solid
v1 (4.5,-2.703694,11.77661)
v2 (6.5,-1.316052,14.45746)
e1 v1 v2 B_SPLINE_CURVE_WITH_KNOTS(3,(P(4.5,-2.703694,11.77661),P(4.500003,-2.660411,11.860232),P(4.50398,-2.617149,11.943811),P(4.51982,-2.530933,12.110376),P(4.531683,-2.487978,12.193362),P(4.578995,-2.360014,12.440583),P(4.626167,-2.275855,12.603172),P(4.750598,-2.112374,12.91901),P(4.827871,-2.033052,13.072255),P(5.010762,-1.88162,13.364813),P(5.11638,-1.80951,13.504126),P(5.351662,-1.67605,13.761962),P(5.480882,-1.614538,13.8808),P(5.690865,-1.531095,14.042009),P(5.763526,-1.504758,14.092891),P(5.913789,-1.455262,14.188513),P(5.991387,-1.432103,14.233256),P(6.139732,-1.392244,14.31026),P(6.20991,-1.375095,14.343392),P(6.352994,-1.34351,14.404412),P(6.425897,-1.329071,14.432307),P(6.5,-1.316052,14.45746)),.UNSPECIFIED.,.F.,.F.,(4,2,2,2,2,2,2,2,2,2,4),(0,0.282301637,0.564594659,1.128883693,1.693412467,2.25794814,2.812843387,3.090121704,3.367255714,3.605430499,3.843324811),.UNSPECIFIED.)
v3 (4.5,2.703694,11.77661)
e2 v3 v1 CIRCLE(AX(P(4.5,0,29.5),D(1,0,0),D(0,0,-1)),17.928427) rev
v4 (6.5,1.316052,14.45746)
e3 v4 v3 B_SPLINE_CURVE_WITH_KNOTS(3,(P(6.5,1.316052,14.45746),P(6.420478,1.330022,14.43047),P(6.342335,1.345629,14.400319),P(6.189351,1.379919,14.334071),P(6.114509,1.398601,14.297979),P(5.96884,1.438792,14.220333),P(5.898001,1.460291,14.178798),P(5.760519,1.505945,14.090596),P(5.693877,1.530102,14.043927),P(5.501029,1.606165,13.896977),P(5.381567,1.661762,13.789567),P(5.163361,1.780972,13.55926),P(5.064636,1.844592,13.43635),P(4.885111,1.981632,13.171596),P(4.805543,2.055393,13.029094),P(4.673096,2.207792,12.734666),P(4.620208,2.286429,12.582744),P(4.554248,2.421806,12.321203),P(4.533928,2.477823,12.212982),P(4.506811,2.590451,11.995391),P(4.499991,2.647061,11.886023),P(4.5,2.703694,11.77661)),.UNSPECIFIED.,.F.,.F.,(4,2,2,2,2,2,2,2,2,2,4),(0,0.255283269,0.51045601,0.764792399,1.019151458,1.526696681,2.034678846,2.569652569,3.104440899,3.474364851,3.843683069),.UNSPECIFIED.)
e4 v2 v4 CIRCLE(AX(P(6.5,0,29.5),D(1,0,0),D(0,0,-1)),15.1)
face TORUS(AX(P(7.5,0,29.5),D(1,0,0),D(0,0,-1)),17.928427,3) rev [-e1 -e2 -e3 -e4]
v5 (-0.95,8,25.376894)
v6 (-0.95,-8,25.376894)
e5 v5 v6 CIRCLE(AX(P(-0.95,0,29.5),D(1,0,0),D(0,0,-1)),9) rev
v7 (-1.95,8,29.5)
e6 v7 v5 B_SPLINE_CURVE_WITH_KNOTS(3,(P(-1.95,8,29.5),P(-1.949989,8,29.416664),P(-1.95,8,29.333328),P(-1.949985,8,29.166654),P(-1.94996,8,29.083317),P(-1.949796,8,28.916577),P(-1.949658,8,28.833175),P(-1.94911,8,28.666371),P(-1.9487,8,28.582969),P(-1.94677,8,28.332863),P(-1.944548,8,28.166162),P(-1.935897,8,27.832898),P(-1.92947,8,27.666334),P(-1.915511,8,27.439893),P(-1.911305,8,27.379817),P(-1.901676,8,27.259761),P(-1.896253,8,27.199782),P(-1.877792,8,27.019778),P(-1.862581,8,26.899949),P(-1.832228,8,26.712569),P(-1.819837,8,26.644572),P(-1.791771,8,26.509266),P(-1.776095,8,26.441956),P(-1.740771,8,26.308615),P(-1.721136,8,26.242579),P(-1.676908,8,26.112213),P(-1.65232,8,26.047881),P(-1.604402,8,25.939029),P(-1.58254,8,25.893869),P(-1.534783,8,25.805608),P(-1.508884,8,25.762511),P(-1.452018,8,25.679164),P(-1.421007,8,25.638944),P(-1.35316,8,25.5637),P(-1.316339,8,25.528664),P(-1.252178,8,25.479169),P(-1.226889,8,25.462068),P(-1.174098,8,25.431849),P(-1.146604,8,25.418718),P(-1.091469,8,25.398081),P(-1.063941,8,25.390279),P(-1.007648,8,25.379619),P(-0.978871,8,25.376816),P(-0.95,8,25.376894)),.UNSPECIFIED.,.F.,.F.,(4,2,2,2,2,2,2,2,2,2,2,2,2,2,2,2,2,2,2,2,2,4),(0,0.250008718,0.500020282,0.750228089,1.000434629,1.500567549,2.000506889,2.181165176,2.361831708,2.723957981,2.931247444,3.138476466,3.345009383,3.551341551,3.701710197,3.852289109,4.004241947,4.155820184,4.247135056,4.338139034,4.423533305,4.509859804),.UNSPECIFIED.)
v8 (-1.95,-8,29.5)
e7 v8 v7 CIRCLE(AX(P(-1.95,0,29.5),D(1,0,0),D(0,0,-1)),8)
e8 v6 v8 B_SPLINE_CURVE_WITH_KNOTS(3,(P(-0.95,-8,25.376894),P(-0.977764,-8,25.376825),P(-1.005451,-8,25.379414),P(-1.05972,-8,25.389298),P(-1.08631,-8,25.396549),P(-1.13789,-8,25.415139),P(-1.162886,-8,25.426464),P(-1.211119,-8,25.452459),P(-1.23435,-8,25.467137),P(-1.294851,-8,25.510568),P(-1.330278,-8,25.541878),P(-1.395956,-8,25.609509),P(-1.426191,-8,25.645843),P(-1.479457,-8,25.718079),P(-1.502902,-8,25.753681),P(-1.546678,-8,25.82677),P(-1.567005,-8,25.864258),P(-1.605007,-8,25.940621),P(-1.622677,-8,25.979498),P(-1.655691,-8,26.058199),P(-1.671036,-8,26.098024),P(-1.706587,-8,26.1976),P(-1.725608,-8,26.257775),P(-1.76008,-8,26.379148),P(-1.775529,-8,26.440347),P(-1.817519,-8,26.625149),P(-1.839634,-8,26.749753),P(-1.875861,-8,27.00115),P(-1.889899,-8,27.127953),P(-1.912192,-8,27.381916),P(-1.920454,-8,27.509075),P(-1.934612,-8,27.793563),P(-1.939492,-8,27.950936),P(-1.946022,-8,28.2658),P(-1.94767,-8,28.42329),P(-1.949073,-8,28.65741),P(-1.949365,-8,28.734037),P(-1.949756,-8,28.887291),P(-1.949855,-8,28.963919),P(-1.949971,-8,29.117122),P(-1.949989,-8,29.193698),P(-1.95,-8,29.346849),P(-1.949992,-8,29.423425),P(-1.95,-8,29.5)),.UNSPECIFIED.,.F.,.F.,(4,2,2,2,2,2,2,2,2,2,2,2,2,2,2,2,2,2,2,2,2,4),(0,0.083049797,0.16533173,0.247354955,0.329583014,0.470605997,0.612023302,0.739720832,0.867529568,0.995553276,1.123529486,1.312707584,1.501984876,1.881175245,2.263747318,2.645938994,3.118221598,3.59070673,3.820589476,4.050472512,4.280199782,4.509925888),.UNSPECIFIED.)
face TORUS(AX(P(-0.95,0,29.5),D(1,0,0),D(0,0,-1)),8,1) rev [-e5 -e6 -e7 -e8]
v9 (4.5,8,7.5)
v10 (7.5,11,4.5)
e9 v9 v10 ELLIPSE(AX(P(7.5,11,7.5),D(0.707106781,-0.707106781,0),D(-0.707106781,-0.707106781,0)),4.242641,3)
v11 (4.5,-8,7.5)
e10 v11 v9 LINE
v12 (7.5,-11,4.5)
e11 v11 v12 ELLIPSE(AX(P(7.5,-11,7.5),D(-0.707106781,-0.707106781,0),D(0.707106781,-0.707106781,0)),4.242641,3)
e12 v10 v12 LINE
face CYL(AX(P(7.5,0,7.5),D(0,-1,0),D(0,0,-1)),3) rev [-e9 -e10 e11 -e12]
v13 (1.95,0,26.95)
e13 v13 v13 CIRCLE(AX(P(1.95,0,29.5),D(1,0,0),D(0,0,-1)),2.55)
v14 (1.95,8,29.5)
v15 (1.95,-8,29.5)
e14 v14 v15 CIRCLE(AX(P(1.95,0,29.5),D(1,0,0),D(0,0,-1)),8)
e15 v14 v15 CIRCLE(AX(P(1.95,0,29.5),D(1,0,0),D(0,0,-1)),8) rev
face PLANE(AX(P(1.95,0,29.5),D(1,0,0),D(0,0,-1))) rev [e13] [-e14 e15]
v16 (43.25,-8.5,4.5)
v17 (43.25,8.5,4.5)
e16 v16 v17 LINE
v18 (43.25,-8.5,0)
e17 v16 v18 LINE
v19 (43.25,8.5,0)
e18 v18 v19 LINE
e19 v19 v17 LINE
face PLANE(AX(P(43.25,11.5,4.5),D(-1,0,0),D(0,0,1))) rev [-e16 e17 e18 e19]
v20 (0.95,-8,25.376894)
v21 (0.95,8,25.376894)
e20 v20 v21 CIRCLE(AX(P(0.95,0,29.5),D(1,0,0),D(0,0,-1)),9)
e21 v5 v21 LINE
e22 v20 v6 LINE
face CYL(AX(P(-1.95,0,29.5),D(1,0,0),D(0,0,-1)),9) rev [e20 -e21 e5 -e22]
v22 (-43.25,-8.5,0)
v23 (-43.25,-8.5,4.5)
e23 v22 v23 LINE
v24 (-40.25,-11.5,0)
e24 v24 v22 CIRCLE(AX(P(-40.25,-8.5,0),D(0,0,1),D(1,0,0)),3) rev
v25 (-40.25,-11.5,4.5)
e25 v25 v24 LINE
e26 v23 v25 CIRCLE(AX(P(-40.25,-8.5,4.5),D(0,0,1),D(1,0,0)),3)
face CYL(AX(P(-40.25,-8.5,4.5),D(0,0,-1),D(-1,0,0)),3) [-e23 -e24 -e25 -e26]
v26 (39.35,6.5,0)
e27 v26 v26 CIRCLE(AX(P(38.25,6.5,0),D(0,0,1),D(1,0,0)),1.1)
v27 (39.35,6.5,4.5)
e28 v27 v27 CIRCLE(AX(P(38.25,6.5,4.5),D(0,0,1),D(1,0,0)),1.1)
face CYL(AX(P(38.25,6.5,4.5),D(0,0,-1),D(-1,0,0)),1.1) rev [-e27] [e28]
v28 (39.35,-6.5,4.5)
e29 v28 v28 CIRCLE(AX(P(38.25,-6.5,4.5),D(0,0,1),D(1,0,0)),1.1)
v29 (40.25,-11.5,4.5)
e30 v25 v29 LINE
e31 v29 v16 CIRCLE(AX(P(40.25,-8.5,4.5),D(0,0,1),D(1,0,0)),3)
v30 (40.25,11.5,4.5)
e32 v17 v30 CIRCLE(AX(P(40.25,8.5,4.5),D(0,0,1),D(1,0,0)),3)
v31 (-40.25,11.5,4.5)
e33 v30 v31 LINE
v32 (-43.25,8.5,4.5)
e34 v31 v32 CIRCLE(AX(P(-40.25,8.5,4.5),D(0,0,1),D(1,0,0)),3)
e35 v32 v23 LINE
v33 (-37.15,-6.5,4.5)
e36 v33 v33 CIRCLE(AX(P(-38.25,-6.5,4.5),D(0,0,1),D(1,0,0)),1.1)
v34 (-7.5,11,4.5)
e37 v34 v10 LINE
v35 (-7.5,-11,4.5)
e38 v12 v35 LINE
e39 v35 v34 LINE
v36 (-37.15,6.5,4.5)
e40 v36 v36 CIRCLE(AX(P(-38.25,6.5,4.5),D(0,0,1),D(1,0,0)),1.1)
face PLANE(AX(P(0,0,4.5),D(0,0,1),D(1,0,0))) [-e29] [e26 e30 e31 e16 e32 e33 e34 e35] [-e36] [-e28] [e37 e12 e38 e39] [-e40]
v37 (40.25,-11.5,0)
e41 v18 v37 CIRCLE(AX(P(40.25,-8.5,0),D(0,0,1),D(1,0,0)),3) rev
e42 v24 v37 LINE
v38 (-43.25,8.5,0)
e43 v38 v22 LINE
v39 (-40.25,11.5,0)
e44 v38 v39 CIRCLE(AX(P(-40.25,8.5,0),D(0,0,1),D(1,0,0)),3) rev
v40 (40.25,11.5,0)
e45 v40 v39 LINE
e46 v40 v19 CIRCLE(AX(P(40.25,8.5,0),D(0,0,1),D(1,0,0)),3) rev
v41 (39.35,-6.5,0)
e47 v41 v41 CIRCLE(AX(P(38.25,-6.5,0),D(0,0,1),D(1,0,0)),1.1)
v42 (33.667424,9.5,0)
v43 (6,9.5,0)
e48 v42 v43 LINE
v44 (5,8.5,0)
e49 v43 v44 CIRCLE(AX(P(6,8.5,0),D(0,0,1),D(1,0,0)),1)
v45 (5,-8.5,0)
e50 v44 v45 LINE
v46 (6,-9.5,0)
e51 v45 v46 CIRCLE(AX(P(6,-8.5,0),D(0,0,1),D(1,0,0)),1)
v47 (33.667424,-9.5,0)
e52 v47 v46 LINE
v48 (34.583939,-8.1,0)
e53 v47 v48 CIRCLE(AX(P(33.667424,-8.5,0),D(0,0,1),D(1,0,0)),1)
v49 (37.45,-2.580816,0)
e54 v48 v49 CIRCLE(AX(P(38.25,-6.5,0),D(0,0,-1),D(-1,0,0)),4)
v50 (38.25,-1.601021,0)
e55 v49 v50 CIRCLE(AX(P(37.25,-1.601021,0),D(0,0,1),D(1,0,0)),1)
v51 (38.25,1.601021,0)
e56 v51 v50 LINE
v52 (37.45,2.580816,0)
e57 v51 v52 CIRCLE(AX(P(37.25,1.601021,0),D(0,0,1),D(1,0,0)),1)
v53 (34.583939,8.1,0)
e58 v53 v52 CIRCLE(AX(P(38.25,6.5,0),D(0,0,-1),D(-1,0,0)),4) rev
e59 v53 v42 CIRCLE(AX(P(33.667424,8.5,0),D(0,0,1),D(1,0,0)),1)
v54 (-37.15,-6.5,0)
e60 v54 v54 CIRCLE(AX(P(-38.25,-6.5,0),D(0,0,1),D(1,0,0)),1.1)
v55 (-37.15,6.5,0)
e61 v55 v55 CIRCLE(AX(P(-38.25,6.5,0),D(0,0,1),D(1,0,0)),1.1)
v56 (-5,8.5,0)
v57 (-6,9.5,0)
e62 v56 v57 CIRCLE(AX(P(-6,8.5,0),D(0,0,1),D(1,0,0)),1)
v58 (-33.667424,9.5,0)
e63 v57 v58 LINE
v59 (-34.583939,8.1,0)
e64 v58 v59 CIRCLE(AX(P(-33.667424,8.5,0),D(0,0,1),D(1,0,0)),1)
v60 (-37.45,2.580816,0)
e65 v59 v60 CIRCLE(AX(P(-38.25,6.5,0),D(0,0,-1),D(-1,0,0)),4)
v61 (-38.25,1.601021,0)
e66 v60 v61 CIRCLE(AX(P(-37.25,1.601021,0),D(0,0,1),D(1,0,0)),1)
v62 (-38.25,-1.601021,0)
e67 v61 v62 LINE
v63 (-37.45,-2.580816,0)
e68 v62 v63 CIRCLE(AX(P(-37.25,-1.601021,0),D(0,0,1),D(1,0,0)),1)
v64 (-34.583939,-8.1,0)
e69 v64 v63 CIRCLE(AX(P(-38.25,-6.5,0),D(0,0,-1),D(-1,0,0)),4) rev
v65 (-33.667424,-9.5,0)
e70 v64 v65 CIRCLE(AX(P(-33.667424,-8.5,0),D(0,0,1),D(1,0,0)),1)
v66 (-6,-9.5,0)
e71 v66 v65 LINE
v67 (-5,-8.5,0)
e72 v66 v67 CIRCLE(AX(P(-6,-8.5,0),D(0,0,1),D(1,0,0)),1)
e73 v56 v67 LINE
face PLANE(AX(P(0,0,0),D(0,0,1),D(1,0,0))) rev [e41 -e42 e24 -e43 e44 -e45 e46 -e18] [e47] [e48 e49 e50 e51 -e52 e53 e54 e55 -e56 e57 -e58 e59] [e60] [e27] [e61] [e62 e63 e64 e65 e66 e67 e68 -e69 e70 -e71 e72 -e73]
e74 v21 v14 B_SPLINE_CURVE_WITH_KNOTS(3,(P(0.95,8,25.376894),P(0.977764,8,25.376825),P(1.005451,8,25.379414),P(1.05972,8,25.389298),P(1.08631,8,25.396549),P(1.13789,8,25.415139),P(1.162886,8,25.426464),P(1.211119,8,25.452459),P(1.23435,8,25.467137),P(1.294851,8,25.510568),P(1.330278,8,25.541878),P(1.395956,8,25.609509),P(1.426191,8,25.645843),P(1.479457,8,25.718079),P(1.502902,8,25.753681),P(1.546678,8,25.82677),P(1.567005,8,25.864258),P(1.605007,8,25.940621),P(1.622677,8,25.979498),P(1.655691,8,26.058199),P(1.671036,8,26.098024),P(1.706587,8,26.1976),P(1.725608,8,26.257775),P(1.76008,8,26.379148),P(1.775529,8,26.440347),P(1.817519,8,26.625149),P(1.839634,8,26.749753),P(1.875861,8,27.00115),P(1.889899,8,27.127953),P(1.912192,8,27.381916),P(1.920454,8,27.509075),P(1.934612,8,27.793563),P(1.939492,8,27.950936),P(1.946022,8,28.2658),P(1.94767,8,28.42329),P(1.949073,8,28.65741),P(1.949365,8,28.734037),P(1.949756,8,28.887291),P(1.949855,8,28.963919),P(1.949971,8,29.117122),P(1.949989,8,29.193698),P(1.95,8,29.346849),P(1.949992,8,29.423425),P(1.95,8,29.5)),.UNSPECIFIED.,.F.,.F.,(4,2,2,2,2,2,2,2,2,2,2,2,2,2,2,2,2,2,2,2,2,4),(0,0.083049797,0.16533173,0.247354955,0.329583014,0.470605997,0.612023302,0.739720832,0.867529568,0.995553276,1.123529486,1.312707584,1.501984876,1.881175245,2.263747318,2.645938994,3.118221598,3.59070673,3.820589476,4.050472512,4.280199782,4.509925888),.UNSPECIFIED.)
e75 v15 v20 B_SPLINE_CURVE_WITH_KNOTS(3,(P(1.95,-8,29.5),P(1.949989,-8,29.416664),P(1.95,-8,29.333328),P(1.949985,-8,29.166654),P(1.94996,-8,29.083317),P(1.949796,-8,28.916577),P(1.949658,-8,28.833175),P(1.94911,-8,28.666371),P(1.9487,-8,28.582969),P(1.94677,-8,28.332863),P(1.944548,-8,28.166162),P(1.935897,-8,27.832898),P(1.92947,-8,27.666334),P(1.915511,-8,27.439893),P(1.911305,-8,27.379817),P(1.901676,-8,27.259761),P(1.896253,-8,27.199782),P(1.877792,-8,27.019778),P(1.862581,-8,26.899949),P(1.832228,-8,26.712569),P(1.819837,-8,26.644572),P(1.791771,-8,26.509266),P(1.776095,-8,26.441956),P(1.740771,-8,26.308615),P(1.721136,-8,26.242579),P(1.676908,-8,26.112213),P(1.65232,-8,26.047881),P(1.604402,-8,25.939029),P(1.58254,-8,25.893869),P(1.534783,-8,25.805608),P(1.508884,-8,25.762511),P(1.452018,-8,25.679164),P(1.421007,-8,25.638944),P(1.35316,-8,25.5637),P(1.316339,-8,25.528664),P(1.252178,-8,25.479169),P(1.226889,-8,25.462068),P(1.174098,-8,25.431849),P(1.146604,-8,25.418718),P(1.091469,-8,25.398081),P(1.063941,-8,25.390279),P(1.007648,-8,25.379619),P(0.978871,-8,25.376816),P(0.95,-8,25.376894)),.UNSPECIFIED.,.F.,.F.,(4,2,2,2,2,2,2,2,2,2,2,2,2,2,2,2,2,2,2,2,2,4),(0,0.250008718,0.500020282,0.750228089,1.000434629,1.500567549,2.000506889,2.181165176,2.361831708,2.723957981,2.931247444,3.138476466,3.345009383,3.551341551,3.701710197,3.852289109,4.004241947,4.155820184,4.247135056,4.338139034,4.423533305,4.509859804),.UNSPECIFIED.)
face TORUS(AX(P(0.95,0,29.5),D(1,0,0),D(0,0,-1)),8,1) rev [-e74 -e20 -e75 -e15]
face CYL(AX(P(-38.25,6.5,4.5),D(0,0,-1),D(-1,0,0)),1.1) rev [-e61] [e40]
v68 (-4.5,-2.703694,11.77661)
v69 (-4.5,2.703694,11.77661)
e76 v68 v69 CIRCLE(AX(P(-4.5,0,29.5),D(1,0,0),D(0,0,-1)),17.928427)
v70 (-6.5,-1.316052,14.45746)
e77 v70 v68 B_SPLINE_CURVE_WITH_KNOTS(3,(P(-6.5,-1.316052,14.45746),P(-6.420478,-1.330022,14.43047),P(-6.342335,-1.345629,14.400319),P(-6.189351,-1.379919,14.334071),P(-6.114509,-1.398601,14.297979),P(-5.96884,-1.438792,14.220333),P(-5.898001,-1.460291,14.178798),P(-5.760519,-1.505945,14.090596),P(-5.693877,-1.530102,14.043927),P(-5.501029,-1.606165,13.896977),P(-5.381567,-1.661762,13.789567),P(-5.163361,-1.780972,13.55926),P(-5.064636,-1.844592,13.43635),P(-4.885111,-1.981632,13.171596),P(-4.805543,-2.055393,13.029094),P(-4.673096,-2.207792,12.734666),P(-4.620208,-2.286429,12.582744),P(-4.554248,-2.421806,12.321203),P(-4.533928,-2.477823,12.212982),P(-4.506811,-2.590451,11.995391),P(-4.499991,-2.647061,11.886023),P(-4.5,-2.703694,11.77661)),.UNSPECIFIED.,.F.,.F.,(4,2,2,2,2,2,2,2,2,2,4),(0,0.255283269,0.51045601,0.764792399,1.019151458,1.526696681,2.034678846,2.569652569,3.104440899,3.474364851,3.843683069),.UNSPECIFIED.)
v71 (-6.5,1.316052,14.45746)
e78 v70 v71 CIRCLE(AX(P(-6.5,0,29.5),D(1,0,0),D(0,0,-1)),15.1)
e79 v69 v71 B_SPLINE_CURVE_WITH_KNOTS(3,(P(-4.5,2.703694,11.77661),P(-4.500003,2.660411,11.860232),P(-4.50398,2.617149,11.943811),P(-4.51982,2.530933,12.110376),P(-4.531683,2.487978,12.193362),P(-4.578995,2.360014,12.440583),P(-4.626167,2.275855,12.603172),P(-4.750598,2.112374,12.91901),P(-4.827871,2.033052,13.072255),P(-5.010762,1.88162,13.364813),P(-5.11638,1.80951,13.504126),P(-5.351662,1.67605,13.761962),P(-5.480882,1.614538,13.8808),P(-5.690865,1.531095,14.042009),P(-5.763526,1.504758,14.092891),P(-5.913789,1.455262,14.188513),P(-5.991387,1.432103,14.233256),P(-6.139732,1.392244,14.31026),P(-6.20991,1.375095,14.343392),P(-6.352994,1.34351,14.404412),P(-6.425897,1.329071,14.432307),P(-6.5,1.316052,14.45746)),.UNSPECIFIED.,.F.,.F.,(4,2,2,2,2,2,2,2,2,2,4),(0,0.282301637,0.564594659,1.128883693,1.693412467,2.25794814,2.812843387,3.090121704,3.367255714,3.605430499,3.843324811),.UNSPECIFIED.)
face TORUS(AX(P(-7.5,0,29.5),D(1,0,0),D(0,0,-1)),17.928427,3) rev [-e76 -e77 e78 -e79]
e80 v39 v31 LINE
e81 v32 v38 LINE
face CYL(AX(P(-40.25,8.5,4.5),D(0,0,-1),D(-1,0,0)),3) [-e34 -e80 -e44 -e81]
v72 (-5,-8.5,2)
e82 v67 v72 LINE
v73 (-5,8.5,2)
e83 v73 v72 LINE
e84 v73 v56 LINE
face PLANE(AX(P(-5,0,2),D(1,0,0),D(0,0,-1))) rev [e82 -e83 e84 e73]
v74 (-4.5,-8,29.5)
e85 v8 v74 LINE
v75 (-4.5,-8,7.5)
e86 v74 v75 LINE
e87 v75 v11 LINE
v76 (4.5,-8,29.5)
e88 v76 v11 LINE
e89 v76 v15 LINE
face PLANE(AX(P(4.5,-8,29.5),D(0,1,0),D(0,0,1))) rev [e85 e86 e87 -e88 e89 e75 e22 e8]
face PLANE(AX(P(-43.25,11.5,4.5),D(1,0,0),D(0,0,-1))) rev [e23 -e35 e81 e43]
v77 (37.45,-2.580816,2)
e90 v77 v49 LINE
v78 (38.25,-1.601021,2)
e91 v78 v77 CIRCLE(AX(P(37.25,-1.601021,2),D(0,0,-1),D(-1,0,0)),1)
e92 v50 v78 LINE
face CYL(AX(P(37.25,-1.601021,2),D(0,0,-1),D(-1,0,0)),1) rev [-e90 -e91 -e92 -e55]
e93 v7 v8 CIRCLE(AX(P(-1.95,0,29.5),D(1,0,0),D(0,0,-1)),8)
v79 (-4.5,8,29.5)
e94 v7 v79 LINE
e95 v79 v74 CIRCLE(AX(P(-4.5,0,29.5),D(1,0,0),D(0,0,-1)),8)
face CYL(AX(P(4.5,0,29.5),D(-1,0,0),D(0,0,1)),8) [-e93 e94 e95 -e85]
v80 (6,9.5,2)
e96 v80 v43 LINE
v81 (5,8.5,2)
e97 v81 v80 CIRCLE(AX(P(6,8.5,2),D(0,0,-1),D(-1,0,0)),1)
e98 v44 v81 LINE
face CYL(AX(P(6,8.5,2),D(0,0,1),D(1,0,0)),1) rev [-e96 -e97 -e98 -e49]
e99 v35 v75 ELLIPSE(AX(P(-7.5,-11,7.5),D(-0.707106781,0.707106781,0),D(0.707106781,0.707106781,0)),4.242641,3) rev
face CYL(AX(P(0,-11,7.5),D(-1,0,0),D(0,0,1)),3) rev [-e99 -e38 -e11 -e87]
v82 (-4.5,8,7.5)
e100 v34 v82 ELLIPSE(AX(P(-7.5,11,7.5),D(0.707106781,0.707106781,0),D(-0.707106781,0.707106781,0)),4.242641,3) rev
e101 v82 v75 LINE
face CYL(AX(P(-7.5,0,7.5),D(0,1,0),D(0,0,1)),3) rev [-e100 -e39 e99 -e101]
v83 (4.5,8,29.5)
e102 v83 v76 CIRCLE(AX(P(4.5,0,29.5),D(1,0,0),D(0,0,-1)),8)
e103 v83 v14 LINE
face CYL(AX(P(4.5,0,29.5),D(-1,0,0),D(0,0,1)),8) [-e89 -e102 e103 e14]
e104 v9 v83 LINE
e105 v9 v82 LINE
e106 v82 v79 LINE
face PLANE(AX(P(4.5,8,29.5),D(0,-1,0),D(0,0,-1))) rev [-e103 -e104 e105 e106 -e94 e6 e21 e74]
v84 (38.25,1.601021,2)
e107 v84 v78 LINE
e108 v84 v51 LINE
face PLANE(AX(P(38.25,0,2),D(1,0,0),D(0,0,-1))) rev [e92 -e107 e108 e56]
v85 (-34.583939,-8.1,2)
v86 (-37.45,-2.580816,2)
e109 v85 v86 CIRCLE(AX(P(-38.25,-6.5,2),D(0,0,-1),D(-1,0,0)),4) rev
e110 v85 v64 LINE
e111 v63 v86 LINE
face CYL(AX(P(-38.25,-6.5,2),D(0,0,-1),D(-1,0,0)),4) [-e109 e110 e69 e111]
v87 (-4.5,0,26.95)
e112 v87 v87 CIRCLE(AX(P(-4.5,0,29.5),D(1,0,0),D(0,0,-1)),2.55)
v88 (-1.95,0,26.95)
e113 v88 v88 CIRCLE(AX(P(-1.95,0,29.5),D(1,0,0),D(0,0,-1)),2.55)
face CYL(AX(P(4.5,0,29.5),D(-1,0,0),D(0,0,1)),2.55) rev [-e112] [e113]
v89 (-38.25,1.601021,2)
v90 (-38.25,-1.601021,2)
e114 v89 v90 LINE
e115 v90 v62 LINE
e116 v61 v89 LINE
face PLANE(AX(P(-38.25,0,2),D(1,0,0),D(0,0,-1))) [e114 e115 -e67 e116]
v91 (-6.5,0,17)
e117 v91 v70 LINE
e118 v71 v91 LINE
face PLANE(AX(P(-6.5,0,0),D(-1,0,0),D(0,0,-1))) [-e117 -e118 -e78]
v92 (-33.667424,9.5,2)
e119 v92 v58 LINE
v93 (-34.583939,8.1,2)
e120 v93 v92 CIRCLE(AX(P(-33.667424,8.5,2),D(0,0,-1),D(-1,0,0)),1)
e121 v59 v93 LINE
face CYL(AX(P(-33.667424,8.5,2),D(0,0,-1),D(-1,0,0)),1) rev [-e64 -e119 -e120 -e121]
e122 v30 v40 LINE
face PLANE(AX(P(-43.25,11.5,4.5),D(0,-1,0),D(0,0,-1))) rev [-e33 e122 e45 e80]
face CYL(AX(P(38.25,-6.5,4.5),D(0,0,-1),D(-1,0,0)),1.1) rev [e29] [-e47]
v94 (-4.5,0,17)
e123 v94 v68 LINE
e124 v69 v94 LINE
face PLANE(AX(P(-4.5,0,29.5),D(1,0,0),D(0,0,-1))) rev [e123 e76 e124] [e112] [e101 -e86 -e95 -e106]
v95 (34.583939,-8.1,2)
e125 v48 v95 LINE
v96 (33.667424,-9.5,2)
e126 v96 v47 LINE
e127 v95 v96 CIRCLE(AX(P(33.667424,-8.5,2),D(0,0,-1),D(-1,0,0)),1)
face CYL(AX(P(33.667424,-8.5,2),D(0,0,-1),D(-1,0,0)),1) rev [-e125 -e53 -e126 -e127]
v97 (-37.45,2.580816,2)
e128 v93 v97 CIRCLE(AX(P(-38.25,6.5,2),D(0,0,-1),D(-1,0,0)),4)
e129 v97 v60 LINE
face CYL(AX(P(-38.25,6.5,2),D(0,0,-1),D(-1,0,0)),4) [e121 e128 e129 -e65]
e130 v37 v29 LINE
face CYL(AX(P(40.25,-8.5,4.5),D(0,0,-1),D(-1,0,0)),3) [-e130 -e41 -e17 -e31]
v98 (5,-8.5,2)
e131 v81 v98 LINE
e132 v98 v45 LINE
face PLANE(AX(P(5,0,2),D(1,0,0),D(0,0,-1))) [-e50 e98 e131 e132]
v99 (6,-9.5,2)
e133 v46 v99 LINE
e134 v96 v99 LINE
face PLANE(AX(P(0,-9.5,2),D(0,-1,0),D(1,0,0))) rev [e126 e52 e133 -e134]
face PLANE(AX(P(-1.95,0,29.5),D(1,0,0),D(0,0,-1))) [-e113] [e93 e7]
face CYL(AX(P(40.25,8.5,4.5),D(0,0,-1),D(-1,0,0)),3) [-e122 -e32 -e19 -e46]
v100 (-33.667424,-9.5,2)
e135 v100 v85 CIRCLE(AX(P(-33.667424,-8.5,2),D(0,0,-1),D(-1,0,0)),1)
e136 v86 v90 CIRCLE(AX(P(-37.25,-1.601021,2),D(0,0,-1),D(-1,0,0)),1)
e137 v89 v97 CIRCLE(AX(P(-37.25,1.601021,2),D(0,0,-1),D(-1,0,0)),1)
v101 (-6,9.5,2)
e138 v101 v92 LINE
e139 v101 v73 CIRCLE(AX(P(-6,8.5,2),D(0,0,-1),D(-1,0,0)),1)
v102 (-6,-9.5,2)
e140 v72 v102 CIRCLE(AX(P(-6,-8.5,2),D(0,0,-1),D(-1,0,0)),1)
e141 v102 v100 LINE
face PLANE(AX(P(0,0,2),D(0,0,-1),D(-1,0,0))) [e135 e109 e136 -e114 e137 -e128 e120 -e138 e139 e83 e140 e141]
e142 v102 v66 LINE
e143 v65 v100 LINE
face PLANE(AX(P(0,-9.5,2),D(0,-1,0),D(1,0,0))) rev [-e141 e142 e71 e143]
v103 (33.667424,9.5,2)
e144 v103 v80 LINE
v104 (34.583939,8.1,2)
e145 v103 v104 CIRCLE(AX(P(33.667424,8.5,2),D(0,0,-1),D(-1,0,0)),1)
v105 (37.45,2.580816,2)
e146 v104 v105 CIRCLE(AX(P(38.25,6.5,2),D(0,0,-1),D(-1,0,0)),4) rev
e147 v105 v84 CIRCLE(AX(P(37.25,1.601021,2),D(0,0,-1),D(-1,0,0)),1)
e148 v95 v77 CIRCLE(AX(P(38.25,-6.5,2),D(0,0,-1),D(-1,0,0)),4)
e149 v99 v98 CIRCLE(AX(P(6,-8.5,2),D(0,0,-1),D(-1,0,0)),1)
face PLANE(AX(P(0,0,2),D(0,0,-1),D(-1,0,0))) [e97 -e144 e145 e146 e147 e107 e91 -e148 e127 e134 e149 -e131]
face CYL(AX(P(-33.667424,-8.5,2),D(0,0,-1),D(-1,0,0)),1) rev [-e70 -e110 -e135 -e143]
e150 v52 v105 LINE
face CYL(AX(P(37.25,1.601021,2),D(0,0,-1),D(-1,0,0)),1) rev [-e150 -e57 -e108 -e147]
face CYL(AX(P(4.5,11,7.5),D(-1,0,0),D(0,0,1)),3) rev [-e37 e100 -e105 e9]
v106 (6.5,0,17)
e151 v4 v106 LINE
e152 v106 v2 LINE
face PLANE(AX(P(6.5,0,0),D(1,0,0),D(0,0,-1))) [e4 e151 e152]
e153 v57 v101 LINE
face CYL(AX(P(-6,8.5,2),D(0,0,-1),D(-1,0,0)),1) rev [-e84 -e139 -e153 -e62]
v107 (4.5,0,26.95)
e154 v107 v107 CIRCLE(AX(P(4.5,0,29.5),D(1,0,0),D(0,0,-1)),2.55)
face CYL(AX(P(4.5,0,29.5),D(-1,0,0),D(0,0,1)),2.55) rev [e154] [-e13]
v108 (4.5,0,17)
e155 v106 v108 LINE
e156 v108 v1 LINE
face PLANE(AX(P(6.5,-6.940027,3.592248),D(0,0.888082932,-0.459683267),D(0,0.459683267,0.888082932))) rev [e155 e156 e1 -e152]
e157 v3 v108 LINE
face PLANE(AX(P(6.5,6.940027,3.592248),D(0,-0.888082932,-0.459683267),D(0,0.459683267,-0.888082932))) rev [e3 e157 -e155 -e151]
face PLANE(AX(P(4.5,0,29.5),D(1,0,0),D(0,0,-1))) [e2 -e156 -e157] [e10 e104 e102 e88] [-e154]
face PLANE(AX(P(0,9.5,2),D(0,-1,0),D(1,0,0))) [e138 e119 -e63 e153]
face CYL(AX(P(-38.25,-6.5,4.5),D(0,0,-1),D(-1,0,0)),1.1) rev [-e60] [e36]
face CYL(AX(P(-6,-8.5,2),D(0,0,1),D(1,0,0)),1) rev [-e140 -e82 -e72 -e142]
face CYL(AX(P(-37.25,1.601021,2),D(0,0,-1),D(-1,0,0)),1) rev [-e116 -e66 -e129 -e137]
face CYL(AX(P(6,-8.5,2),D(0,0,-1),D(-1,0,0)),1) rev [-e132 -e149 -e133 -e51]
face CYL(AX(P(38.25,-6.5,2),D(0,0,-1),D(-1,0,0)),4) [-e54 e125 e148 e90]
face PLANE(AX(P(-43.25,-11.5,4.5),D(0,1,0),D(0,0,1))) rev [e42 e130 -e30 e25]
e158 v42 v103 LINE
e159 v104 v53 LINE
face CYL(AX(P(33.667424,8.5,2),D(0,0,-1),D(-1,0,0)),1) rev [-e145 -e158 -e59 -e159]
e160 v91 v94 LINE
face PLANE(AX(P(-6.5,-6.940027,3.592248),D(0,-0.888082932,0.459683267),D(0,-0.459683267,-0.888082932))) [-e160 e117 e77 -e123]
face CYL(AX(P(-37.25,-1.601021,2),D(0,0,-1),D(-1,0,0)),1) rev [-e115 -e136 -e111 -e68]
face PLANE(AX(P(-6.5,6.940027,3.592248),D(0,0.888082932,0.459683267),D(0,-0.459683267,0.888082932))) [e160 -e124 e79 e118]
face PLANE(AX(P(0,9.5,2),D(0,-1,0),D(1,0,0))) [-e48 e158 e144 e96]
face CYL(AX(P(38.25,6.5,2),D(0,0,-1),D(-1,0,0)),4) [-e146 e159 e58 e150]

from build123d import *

# Parameters (mm, degrees)
SKETCH1_W           = 86.5
SKETCH1_H           = 23
SKETCH1_R           = 1.1
BOSS_EXTRUDE1_DEPTH = 4.5
CUT_EXTRUDE1_DEPTH  = 2
SKETCH3_R           = 2.55
BOSS_EXTRUDE2_DEPTH = 4.5
SKETCH6_R           = 9
CUT_EXTRUDE3_DEPTH  = 1.95
FILLET1_R           = 3
FILLET2_R           = 1
FILLET3_R           = 1
BOSS_EXTRUDE3_DEPTH = 2
FILLET4_R           = 3


with BuildPart() as part:
    # Sketch1 → Boss-Extrude1 (new body)
    with BuildSketch(Plane.XY):
        Rectangle(SKETCH1_W, SKETCH1_H)
        with Locations((38.25, 6.5)):
            Circle(SKETCH1_R, mode=Mode.SUBTRACT)
        with Locations((38.25, -6.5)):
            Circle(SKETCH1_R, mode=Mode.SUBTRACT)
        with Locations((-38.25, -6.5)):
            Circle(SKETCH1_R, mode=Mode.SUBTRACT)
        with Locations((-38.25, 6.5)):
            Circle(SKETCH1_R, mode=Mode.SUBTRACT)
    extrude(amount=BOSS_EXTRUDE1_DEPTH)

    # Sketch2 → Cut-Extrude1 (cut)
    with BuildSketch(Plane(origin=(0, 0, 0), x_dir=(-1, 0, 0), z_dir=(0, 0, -1))):
        with BuildLine():
            Line((-5, 9.5), (-35.604248689, 9.5))
            ThreePointArc((-35.604248689, 9.5), (-34.508342613, 5.085786438), (-38.25, 2.5))
            Line((-38.25, 2.5), (-38.25, -2.5))
            ThreePointArc((-38.25, -2.5), (-34.508342613, -5.085786438), (-35.604248689, -9.5))
            Line((-35.604248689, -9.5), (-5, -9.5))
            Line((-5, -9.5), (-5, 9.5))
        make_face()
        with BuildLine():
            Line((35.604248689, 9.5), (5, 9.5))
            Line((5, 9.5), (5, -9.5))
            Line((5, -9.5), (35.604248689, -9.5))
            ThreePointArc((35.604248689, -9.5), (34.508342613, -5.085786438), (38.25, -2.5))
            Line((38.25, -2.5), (38.25, 2.5))
            ThreePointArc((38.25, 2.5), (34.508342613, 5.085786438), (35.604248689, 9.5))
        make_face()
    extrude(amount=-CUT_EXTRUDE1_DEPTH, mode=Mode.SUBTRACT)

    # Sketch3 → Boss-Extrude2 (add, symmetric)
    with BuildSketch(Plane(origin=(0, 0, 0), x_dir=(0, 0, -1), z_dir=(1, 0, 0))):
        with BuildLine():
            Line((-29.5, 8), (-4.5, 8))
            Line((-4.5, 8), (-4.5, -8))
            Line((-4.5, -8), (-29.5, -8))
            ThreePointArc((-29.5, -8), (-37.5, 0), (-29.5, 8))
        make_face()
        with Locations((-29.5, 0)):
            Circle(SKETCH3_R, mode=Mode.SUBTRACT)
    extrude(amount=BOSS_EXTRUDE2_DEPTH, both=True)

    # Sketch6 → Cut-Extrude3 (cut, symmetric)
    with BuildSketch(Plane(origin=(0, 0, 0), x_dir=(0, 0, -1), z_dir=(1, 0, 0))):
        with Locations((-29.5, 0)):
            Circle(SKETCH6_R)
    extrude(amount=CUT_EXTRUDE3_DEPTH, both=True, mode=Mode.SUBTRACT)

    # Fillet1
    fillet1_edges = [part.edges().sort_by_distance(p)[0] for p in [
        (4.5, 0, 4.5),
        (-4.5, 0, 4.5),
        (0, -8, 4.5),
        (0, 8, 4.5),
        (43.25, -11.5, 2.25),
        (-43.25, -11.5, 2.25),
        (-43.25, 11.5, 2.25),
        (43.25, 11.5, 2.25),
    ]]
    fillet(fillet1_edges, radius=FILLET1_R)

    # Fillet2
    fillet2_edges = [part.edges().sort_by_distance(p)[0] for p in [
        (1.95, 0, 20.5),
        (-1.95, 0, 20.5),
    ]]
    fillet(fillet2_edges, radius=FILLET2_R)

    # Fillet3
    fillet3_edges = [part.edges().sort_by_distance(p)[0] for p in [
        (35.604248689, -9.5, 1),
        (38.25, -2.5, 1),
        (38.25, 2.5, 1),
        (35.604248689, 9.5, 1),
        (5, 9.5, 1),
        (5, -9.5, 1),
        (-35.604248689, -9.5, 1),
        (-5, -9.5, 1),
        (-5, 9.5, 1),
        (-35.604248689, 9.5, 1),
        (-38.25, 2.5, 1),
        (-38.25, -2.5, 1),
    ]]
    fillet(fillet3_edges, radius=FILLET3_R)

    # Sketch7 → Boss-Extrude3 (add)
    with BuildSketch(Plane(origin=(4.5, 0, 0), x_dir=(0, 0, -1), z_dir=(1, 0, 0))):
        Polygon((-14.457460059, 1.316051715), (-17, 0), (-14.457460059, 0), align=None)
        Polygon((-14.457460059, 0), (-17, 0), (-14.457460059, -1.316051715), align=None)
        with BuildLine():
            Line((-14.457460059, 0), (-14.457460059, -1.316051715))
            ThreePointArc((-14.457460059, -1.316051715), (-14.414371854, -0.658652749), (-14.4, 0))
            Line((-14.4, 0), (-14.457460059, 0))
        make_face()
        with BuildLine():
            ThreePointArc((-14.4, 0), (-14.414371854, 0.658652749), (-14.457460059, 1.316051715))
            Line((-14.457460059, 1.316051715), (-14.457460059, 0))
            Line((-14.457460059, 0), (-14.4, 0))
        make_face()
    boss_extrude3 = extrude(amount=BOSS_EXTRUDE3_DEPTH)

    # Mirror1: Boss-Extrude3 across plane
    add(boss_extrude3.mirror(Plane(origin=(0, 0, 0), x_dir=(0, 0, 1), z_dir=(1, 0, 0))))

    # Fillet4
    # the kernel refuses this fillet: 3 mm, written as the material it adds along each edge
    with BuildSketch(Plane(origin=(4.5, 0, 29.5), x_dir=(0, -0.5274118729194984, -0.8496097435314327), z_dir=(0, -0.8496097435314327, 0.5274118729194984))) as fillet4_piece_1_section:
        with BuildLine():
            CenterArc((17.928427125, 3), FILLET4_R, 199.471220634, 70.528779366)
            Line((15.1, 2), (15.043431458, 1.98))
            ThreePointArc((15.043431458, 1.98), (15.04, 1), (15.04, 0))
            Line((15.04, 0), (15.1, -0.06))
            Line((15.1, -0.06), (17.928427125, -0.06))
            Line((17.928427125, -0.06), (17.928427125, 0))
        make_face()
    fillet4_piece_1 = revolve(axis=Axis((4.5, 0, 29.5), (1, 0, 0)), revolution_arc=63.661503438, mode=Mode.PRIVATE)
    fillet4_piece_1 = split(fillet4_piece_1, bisect_by=Plane(origin=(4.961847774, -1.372551705, 14.348305169), z_dir=(0, 0.888082932047281, -0.4596832668330496)), keep=Keep.TOP, mode=Mode.PRIVATE)
    fillet4_piece_1 = split(fillet4_piece_1, bisect_by=Plane(origin=(4.961847774, 1.372551598, 14.348305377), z_dir=(0, -0.8880829320471848, -0.4596832668332354)), keep=Keep.TOP, mode=Mode.PRIVATE)
    add(fillet4_piece_1)
    with BuildSketch(Plane(origin=(-4.5, 0, 29.5), x_dir=(0, -0.5274118729194984, -0.8496097435314327), z_dir=(0, -0.8496097435314327, 0.5274118729194984))) as fillet4_piece_2_section:
        with BuildLine():
            CenterArc((17.928427125, -3), FILLET4_R, 90, 70.528779366)
            Line((15.1, -2), (15.043431458, -1.98))
            ThreePointArc((15.043431458, -1.98), (15.04, -1), (15.04, 0))
            Line((15.04, 0), (15.1, 0.06))
            Line((15.1, 0.06), (17.928427125, 0.06))
            Line((17.928427125, 0.06), (17.928427125, 0))
        make_face()
    fillet4_piece_2 = revolve(axis=Axis((-4.5, 0, 29.5), (1, 0, 0)), revolution_arc=63.661503438, mode=Mode.PRIVATE)
    fillet4_piece_2 = split(fillet4_piece_2, bisect_by=Plane(origin=(-4.961847774, -1.372551705, 14.348305169), z_dir=(0, 0.888082932047281, -0.4596832668330496)), keep=Keep.TOP, mode=Mode.PRIVATE)
    fillet4_piece_2 = split(fillet4_piece_2, bisect_by=Plane(origin=(-4.961847774, 1.372551598, 14.348305377), z_dir=(0, -0.8880829320471848, -0.4596832668332354)), keep=Keep.TOP, mode=Mode.PRIVATE)
    add(fillet4_piece_2)


solid = part.part
